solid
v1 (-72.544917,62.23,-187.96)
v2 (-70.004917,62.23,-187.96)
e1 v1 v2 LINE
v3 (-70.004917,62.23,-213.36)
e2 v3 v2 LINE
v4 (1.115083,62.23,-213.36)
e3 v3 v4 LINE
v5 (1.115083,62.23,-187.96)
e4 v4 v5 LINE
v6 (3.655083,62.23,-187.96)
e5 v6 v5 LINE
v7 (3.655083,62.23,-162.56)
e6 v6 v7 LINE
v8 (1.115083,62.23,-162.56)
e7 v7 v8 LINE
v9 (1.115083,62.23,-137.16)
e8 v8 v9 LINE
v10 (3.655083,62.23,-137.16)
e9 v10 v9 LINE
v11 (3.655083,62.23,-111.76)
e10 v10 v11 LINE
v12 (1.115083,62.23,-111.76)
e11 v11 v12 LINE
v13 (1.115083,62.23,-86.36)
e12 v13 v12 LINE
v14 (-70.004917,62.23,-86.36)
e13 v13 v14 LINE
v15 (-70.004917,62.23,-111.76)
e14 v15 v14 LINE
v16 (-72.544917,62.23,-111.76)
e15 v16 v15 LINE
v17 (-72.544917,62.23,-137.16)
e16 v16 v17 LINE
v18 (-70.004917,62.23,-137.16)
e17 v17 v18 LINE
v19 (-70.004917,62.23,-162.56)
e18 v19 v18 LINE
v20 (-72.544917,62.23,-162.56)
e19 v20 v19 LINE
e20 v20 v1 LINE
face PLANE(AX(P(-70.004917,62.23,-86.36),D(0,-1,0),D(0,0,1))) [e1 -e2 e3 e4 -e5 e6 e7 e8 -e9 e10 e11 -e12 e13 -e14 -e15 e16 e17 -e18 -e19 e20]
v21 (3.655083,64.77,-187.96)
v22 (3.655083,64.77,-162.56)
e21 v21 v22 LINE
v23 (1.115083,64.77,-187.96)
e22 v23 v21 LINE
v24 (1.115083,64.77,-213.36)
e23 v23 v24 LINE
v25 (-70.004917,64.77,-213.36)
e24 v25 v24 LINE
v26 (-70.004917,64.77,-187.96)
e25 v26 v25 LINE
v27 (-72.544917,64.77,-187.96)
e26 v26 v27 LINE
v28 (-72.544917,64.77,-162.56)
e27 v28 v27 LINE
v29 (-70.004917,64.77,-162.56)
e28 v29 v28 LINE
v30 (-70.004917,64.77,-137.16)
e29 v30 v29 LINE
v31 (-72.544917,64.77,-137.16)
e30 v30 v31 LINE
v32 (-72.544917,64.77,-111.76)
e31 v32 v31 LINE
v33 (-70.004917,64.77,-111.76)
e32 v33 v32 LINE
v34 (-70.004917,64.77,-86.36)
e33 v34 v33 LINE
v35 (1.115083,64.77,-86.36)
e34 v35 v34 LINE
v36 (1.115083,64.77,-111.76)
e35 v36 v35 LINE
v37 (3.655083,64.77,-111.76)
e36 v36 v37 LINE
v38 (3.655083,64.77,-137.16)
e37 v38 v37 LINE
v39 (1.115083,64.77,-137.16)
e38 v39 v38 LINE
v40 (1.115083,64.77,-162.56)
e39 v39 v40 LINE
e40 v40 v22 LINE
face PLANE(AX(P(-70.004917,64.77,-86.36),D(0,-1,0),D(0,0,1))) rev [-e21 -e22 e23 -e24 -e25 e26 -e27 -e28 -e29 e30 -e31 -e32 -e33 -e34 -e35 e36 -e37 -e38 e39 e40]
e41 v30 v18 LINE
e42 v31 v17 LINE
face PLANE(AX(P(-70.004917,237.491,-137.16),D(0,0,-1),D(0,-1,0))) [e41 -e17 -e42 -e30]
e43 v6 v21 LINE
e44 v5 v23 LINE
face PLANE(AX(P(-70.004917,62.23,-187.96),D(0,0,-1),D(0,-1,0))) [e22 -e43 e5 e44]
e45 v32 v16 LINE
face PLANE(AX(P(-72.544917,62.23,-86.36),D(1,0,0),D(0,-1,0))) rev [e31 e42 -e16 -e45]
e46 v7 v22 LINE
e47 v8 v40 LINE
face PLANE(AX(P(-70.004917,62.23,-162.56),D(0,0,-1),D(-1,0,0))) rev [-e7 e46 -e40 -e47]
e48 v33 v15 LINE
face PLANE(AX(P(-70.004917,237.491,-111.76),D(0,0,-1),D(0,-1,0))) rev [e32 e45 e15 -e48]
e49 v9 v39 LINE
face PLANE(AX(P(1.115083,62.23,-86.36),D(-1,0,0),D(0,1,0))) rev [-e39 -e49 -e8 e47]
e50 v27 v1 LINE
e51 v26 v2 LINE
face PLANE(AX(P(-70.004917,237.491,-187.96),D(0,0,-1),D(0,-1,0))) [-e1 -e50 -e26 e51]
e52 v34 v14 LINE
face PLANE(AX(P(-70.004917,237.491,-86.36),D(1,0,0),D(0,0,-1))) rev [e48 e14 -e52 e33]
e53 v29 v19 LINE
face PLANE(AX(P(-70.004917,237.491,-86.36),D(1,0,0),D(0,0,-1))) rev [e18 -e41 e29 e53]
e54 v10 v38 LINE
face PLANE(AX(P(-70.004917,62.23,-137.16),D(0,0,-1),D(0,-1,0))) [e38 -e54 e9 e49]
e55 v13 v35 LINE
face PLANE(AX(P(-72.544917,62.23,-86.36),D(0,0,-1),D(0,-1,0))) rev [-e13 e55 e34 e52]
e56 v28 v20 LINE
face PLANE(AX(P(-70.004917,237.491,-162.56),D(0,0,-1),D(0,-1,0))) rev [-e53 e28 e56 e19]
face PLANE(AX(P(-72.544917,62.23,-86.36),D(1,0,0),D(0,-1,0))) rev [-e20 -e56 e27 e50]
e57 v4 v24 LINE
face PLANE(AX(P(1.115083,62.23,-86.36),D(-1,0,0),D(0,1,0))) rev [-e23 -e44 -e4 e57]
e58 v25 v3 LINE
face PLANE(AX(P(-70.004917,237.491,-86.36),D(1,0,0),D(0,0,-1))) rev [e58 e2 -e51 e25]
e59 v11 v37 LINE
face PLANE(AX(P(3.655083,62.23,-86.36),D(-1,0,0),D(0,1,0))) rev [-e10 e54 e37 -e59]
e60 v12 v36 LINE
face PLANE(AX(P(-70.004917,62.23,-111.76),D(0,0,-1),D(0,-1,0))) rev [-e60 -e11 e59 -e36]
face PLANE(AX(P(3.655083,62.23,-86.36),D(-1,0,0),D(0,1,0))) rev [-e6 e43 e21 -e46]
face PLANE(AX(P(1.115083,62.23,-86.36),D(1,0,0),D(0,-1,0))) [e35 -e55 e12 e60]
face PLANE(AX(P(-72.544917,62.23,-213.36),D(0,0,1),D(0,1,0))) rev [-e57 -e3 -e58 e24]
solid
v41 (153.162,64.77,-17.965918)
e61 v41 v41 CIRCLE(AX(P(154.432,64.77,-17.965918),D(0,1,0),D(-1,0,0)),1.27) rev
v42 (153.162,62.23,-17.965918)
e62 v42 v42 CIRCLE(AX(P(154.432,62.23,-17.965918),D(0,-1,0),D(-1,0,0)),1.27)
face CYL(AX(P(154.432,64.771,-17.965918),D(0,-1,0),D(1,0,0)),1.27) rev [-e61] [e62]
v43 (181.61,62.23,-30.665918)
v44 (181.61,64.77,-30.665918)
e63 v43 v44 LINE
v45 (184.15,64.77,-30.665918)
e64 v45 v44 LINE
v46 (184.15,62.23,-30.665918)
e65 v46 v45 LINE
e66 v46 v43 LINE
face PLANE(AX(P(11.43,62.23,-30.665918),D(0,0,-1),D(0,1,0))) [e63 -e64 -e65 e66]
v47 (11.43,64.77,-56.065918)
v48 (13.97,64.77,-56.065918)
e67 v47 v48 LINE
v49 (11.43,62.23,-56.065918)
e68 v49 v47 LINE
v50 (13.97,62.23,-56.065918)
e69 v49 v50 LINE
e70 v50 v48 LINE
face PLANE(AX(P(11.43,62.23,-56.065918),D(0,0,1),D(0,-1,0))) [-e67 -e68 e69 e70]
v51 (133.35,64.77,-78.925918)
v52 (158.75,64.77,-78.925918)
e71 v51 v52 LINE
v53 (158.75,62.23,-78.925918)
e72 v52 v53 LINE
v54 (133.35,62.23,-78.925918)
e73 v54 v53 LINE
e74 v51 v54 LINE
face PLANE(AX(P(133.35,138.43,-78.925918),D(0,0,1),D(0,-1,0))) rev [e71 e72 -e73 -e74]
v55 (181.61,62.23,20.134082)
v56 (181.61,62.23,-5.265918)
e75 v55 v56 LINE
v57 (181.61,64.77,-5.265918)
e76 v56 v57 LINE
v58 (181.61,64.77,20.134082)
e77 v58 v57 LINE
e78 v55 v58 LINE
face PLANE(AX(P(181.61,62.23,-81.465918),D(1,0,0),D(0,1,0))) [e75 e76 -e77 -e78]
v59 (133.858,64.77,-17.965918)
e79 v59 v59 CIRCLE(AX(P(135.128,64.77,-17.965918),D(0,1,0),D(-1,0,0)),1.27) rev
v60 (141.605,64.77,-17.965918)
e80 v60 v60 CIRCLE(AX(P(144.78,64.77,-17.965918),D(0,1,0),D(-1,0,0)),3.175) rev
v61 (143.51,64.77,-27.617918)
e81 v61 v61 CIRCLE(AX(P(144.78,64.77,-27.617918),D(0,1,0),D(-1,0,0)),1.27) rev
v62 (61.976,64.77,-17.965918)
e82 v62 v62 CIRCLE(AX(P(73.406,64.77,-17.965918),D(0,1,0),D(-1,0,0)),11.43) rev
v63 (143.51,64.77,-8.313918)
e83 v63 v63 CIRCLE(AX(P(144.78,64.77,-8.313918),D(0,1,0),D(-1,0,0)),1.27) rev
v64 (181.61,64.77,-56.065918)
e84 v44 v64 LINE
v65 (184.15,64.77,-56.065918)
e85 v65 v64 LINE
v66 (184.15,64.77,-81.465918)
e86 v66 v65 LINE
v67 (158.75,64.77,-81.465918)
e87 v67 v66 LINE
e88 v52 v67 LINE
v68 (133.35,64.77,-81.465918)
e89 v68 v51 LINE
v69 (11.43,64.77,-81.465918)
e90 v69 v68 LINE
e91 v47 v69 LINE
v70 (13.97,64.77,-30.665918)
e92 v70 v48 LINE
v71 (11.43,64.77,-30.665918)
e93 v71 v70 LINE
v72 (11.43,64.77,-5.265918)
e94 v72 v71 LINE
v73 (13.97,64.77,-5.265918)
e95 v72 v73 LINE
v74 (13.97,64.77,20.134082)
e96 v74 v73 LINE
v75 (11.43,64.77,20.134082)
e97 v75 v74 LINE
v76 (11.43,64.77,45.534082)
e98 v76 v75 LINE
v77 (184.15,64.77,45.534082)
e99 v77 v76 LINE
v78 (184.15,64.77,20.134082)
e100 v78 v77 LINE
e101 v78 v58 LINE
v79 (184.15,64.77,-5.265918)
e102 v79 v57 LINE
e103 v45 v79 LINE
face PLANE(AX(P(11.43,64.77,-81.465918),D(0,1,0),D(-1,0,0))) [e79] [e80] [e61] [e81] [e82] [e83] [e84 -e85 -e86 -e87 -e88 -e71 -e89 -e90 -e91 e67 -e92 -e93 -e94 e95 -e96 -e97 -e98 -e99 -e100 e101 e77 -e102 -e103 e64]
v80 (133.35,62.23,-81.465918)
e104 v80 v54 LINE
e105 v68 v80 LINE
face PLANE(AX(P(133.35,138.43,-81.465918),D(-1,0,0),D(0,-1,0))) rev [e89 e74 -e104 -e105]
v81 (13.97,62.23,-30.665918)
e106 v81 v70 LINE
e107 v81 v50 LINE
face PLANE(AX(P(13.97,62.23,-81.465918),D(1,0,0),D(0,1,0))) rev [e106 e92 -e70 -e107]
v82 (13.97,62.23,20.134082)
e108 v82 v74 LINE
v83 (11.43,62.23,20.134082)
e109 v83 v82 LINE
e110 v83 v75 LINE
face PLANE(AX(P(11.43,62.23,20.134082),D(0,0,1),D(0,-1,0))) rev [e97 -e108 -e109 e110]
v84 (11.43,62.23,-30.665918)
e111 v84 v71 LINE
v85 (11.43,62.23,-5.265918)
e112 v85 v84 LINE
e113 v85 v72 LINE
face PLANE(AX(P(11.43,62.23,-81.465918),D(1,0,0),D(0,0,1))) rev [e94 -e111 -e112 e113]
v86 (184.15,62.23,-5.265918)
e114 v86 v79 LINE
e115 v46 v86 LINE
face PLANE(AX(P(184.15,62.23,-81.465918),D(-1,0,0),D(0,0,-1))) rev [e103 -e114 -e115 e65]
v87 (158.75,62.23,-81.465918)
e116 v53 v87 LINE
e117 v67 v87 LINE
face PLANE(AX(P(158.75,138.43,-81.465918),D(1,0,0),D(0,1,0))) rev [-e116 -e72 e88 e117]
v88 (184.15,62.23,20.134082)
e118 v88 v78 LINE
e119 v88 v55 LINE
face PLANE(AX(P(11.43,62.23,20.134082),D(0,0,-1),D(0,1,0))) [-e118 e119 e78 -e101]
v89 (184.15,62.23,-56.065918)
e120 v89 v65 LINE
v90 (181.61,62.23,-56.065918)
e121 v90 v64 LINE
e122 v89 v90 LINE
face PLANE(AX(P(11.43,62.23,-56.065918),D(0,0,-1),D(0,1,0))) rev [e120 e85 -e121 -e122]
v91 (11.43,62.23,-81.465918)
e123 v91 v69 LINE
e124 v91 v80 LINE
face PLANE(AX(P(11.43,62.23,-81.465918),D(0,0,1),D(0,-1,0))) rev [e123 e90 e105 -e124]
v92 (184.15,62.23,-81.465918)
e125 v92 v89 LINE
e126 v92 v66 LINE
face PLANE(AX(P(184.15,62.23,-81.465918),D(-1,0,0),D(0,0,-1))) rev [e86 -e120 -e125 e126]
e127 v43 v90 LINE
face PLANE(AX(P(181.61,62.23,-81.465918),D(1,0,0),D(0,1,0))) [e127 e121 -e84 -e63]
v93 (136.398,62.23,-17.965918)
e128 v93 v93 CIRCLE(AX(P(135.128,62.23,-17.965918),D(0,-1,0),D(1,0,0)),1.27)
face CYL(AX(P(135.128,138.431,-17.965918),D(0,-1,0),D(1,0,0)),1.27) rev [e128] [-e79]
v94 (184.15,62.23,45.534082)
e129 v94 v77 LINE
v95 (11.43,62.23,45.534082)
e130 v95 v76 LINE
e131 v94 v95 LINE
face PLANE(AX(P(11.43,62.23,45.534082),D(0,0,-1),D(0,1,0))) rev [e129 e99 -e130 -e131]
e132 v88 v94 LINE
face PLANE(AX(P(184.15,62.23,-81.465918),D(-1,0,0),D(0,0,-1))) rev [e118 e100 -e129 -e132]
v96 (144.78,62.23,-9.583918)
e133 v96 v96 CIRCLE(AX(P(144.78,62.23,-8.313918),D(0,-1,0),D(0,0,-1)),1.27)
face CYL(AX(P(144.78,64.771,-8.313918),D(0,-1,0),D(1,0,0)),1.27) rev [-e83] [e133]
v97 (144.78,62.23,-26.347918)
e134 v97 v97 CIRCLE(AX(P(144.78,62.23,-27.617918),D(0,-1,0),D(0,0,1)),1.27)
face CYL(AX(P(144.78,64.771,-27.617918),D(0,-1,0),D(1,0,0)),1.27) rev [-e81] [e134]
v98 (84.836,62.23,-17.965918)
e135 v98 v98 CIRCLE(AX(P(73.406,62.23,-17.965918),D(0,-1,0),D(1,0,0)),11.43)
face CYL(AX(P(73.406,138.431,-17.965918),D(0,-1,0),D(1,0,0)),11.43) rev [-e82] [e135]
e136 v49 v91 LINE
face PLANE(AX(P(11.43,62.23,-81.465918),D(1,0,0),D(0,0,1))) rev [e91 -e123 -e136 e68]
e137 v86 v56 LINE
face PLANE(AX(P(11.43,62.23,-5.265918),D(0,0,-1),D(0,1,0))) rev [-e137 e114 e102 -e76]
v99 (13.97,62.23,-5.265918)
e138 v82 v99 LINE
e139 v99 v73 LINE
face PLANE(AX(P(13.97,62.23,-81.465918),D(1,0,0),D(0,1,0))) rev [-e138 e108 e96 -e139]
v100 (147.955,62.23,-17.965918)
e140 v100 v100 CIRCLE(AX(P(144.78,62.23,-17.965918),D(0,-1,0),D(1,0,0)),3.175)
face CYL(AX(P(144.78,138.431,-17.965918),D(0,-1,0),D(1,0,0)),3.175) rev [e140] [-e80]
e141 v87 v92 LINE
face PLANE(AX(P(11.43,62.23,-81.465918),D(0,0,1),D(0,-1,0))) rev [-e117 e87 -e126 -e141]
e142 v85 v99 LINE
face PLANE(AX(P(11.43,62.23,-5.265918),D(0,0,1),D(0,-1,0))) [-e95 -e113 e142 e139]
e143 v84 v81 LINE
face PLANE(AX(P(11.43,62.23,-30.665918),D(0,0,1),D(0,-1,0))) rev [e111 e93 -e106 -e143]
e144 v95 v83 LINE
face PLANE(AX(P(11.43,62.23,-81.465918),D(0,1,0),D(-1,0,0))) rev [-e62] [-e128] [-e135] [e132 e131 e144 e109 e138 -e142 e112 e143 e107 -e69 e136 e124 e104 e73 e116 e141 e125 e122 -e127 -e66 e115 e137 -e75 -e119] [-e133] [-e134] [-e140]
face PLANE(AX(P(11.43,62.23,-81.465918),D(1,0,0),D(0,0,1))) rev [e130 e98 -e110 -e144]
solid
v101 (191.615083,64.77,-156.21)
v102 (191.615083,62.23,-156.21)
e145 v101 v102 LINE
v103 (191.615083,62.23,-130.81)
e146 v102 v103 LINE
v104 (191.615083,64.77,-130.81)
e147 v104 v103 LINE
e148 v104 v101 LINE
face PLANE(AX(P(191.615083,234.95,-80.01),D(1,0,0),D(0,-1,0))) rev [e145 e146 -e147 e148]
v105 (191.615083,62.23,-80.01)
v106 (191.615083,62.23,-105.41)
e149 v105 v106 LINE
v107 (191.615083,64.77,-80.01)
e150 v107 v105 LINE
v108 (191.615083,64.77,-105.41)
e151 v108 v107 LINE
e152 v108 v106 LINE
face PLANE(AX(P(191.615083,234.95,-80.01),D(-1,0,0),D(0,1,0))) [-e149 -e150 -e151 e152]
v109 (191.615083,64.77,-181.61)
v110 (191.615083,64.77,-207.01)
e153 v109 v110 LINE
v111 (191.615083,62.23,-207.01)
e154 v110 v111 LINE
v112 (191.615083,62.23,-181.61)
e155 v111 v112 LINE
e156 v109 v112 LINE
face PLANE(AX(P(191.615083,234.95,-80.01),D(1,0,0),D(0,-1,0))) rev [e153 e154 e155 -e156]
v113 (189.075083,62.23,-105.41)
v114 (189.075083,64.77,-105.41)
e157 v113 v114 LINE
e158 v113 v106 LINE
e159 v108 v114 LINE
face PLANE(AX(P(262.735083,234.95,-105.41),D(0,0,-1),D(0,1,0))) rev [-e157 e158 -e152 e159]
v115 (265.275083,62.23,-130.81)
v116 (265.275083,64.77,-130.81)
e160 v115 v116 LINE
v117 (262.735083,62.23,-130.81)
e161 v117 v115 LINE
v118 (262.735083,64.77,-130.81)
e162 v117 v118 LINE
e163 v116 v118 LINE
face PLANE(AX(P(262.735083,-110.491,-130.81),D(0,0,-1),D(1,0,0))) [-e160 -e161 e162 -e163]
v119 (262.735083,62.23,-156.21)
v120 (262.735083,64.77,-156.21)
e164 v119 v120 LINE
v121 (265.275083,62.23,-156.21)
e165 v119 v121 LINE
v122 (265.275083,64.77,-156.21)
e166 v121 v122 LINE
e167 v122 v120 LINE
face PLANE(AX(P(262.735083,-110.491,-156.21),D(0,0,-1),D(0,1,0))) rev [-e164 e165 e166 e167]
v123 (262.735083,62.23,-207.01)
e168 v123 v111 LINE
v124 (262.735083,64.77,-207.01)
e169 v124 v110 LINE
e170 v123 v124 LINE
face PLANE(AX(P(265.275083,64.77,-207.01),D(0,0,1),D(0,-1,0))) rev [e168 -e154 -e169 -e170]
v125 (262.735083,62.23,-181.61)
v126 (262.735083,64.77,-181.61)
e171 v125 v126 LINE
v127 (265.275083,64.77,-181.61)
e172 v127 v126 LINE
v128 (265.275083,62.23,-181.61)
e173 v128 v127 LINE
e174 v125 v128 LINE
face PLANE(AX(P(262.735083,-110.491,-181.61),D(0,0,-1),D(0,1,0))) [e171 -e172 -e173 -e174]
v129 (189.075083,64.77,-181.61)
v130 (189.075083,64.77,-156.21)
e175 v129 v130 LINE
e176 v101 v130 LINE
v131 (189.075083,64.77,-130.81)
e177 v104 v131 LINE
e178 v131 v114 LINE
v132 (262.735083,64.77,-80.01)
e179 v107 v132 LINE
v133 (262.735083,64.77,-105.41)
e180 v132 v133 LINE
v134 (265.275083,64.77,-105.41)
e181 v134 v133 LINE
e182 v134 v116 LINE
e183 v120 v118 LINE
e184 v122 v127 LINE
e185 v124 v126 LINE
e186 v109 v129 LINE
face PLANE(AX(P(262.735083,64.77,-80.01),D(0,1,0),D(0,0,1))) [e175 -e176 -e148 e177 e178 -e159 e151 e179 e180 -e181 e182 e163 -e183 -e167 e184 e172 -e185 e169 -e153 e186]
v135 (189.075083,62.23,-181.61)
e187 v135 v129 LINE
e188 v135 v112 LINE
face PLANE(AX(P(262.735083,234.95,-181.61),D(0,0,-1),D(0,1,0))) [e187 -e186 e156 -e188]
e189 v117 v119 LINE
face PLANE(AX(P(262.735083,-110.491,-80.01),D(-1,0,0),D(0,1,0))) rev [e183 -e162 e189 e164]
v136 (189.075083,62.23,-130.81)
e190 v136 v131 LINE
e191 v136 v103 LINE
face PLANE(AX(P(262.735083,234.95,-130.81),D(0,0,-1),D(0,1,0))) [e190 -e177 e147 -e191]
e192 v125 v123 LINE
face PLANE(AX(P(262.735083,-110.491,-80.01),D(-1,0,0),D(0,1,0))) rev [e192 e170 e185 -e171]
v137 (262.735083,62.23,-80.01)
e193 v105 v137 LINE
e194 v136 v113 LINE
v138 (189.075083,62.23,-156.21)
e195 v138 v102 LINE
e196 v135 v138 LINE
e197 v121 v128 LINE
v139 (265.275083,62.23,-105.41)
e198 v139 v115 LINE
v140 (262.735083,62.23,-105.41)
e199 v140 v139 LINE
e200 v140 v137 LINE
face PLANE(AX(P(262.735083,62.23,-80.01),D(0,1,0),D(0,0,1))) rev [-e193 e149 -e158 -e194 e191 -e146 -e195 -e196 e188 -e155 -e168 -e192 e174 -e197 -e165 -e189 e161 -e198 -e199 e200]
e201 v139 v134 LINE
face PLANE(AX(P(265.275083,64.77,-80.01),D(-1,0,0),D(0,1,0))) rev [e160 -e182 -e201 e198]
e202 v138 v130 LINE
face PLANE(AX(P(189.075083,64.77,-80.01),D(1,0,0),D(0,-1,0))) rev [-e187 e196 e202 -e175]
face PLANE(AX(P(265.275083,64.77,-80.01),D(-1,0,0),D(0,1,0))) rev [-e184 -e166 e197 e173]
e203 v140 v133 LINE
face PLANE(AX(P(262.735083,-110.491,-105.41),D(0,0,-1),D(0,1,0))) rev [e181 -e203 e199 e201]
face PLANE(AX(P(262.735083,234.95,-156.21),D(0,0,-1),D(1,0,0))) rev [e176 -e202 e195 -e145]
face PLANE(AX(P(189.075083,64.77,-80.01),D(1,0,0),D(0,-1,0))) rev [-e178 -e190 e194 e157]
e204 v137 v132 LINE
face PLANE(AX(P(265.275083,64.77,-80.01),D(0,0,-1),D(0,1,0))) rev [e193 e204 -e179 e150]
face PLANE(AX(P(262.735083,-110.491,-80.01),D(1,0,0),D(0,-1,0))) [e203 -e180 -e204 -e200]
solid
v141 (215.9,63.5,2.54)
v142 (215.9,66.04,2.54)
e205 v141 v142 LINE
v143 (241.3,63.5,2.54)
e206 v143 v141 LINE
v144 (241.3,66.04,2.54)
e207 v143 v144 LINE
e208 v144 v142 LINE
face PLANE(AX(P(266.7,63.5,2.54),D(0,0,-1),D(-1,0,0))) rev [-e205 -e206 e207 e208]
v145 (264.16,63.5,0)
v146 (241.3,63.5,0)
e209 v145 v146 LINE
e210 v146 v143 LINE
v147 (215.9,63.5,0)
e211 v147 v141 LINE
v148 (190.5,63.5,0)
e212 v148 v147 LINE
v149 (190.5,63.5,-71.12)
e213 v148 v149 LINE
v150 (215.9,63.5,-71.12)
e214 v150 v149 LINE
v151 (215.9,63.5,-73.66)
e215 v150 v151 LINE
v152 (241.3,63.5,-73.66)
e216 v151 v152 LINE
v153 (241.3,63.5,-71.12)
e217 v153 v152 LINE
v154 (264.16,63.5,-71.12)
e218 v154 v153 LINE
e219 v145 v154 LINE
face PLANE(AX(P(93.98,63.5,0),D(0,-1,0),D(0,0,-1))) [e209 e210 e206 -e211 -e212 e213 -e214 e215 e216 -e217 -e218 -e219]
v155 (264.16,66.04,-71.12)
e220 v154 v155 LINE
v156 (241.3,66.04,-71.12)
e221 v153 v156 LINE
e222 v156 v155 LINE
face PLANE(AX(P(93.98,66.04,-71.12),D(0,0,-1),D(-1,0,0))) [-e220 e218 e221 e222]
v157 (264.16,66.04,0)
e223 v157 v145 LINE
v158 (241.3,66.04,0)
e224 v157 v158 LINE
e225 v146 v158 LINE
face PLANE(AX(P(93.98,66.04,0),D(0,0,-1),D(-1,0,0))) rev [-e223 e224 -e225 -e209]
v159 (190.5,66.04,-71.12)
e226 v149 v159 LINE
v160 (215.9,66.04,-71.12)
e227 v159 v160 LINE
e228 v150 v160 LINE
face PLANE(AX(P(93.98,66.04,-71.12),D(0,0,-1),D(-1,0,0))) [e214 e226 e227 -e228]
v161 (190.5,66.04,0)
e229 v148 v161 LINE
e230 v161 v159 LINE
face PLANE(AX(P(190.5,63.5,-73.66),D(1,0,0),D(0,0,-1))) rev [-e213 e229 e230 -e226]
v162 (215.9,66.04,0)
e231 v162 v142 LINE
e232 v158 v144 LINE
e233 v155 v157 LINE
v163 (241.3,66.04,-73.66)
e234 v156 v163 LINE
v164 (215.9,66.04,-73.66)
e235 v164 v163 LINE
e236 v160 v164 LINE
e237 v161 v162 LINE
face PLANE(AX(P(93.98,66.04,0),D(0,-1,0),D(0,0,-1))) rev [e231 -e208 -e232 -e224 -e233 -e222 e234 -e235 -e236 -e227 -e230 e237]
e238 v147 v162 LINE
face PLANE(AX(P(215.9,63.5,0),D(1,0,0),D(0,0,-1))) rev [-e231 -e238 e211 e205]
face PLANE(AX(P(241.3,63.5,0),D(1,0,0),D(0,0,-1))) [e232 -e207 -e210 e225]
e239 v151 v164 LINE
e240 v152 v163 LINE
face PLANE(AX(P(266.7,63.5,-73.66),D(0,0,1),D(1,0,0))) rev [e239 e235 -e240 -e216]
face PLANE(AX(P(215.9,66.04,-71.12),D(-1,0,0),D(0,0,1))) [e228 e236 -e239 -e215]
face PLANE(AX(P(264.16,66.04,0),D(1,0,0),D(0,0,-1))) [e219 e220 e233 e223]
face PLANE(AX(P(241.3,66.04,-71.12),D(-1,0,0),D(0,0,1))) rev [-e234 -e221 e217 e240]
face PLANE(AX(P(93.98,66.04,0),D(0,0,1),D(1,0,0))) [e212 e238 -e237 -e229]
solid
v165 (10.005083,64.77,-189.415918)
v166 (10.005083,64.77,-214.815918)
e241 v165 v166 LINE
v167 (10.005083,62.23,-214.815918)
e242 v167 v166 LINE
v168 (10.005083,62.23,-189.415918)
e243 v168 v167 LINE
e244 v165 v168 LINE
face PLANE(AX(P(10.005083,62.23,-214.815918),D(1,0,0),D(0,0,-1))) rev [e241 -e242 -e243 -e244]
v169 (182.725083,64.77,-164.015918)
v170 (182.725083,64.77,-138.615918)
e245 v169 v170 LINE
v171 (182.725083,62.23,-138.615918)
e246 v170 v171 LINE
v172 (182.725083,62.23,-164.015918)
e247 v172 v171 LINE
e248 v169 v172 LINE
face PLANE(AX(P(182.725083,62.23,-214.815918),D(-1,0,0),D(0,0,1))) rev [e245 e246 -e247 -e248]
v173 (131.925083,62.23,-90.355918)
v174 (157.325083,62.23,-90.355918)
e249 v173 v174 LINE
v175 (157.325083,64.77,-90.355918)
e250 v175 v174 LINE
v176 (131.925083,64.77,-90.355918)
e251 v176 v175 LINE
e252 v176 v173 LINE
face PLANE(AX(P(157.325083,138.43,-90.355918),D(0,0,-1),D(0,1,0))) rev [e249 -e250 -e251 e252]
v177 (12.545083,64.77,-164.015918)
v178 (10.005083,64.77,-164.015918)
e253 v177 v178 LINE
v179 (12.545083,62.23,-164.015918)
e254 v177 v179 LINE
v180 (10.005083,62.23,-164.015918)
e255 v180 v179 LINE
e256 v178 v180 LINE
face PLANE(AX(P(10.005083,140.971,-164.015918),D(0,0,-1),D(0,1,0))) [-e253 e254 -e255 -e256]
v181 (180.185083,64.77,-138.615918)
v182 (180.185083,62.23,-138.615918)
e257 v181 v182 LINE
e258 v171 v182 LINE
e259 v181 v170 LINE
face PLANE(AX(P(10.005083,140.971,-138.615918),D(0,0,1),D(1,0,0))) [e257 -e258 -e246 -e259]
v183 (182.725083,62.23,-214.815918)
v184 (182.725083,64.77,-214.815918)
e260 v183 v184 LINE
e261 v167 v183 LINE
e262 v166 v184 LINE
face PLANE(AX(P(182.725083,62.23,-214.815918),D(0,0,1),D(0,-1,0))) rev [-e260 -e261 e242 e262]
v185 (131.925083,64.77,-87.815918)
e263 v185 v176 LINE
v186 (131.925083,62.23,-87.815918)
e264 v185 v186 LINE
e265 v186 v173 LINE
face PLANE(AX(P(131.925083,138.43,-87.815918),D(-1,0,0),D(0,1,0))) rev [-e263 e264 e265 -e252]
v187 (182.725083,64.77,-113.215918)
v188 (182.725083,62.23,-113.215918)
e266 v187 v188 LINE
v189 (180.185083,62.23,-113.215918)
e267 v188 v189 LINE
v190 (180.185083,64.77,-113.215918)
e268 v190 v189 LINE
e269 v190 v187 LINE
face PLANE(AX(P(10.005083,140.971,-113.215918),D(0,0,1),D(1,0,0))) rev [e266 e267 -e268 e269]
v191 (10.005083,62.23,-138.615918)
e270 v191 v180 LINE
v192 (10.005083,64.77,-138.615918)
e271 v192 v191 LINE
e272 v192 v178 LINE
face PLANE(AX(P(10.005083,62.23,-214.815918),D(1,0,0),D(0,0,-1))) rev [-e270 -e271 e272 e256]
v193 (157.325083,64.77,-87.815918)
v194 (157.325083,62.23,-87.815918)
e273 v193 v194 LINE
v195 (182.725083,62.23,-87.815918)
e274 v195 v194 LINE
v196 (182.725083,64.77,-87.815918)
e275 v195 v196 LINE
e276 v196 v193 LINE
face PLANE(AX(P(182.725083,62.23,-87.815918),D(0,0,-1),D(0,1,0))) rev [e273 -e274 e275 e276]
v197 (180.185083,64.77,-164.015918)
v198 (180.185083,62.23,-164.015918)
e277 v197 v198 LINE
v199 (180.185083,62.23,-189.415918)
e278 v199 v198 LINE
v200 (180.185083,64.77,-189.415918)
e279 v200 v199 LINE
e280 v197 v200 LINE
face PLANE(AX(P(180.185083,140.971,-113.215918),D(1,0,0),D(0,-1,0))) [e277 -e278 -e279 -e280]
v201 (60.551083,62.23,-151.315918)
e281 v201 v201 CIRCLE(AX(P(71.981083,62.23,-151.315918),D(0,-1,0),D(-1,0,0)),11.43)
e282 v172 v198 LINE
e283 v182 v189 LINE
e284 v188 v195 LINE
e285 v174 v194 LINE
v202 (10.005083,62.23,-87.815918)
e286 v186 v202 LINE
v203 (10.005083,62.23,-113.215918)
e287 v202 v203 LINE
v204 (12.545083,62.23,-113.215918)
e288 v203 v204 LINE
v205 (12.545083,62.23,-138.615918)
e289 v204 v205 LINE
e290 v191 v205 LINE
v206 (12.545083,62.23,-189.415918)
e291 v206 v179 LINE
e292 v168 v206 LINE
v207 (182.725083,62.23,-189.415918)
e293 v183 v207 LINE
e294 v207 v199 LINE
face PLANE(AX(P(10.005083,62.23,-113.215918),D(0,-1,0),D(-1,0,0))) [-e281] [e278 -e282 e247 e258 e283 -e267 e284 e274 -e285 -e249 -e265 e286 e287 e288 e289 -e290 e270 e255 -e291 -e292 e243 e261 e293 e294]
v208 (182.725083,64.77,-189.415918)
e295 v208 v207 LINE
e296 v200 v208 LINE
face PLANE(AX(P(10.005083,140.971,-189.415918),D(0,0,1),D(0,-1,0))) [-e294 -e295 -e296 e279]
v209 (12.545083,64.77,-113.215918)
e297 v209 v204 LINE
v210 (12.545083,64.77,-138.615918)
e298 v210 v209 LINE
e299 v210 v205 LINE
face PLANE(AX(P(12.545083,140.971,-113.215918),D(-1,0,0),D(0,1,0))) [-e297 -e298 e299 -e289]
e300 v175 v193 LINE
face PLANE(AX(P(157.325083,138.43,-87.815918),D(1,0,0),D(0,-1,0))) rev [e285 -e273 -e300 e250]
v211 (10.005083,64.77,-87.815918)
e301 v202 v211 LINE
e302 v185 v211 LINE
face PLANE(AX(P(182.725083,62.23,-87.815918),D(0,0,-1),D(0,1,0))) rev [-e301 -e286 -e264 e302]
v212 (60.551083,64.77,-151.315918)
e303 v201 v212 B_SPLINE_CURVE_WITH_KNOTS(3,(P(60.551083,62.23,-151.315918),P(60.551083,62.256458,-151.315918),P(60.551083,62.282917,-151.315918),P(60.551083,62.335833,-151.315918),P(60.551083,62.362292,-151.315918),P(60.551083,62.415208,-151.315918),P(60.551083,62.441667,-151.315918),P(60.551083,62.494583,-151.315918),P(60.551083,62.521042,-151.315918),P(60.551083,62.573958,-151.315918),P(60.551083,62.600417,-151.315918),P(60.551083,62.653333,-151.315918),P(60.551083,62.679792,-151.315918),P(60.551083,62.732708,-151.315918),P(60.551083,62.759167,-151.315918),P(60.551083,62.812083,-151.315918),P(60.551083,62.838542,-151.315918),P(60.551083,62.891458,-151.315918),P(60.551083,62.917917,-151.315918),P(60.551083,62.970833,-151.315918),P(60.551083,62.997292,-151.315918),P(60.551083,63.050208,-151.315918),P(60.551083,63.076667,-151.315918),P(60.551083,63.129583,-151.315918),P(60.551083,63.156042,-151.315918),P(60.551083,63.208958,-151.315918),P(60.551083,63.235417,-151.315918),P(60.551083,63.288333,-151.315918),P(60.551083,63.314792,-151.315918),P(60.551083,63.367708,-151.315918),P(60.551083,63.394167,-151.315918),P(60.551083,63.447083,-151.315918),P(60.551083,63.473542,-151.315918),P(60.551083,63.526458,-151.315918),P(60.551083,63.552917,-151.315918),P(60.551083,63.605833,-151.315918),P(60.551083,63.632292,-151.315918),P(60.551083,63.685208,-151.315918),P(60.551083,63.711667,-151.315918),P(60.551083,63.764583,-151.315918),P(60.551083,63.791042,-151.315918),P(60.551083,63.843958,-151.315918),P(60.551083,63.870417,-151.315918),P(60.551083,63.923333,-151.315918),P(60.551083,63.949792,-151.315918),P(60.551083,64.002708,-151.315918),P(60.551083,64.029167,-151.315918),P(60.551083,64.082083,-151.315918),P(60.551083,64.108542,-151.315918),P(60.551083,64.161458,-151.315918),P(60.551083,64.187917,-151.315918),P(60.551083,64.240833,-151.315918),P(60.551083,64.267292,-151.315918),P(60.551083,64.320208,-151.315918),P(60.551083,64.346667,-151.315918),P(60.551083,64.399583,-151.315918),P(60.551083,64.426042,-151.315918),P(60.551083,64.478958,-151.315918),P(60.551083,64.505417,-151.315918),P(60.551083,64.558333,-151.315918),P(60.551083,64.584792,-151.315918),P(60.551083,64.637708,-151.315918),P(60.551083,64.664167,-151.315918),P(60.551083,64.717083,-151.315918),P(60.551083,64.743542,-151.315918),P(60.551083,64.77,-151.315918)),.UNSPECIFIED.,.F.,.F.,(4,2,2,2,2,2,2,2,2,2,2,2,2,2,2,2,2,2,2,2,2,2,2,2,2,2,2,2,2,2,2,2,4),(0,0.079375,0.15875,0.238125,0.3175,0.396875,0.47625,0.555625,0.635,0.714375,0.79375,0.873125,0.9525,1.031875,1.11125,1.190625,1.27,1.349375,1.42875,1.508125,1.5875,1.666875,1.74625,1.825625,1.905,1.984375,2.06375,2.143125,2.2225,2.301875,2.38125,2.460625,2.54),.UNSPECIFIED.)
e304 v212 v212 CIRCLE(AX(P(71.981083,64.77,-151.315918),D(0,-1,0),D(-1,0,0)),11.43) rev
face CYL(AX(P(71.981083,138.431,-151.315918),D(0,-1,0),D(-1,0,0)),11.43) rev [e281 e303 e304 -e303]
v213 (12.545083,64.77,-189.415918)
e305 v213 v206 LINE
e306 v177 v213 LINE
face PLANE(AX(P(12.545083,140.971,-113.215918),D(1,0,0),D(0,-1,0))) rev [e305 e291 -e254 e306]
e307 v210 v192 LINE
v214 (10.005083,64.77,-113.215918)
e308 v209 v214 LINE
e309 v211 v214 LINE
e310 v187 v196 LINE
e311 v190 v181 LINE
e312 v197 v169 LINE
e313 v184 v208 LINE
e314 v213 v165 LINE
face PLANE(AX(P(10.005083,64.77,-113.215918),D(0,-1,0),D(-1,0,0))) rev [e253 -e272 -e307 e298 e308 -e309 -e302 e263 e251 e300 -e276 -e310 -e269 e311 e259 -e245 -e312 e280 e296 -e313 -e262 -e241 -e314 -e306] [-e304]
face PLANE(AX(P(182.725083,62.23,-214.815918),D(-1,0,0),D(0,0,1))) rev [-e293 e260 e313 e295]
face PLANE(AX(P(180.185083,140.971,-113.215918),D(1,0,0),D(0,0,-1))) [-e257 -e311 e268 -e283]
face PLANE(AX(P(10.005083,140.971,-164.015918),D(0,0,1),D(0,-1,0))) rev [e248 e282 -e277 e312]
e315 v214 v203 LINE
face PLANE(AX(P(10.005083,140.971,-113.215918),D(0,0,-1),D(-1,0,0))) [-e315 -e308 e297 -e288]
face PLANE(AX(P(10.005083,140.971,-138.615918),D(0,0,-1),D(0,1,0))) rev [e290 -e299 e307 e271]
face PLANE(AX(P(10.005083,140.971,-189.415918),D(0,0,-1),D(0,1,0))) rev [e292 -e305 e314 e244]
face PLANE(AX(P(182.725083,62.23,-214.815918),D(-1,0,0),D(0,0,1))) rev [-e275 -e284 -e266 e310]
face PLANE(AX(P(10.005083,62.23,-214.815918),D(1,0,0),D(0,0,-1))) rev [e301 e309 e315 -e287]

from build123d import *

# Parameters (mm, degrees)
SKETCH1_W                = 172.72
SKETCH1_H                = 127
BOSS_EXTRUDE1_DEPTH      = 2.54
SKETCH2_W                = 2.54
SKETCH2_H                = 25.4
CUT_EXTRUDE1_DEPTH       = 215.400676305
SKETCH3_W                = 2.54
SKETCH3_H                = 25.4
CUT_EXTRUDE2_DEPTH       = 215.400676305
SKETCH11_W               = 76.2
SKETCH11_H               = 127
BOSS_EXTRUDE7_DEPTH      = 2.54
SKETCH19_W               = 2.54
SKETCH19_H               = 25.4
CUT_EXTRUDE7_DEPTH       = 2.54
SKETCH20_W               = 76.2
SKETCH20_H               = 127
BOSS_EXTRUDE8_DEPTH      = 2.54
SKETCH21_W               = 2.54
SKETCH21_H               = 25.4
CUT_EXTRUDE8_DEPTH       = 2.54
SKETCH22_W               = 2.54
SKETCH22_H               = 25.4
CUT_EXTRUDE9_DEPTH       = 227.686995657
SKETCH24_W               = 172.72
SKETCH24_H               = 127
BOSS_EXTRUDE9_DEPTH      = 2.54
SKETCH25_W               = 2.54
SKETCH25_H               = 25.4
CUT_EXTRUDE11_DEPTH      = 2.54
SKETCH28_W               = 76.2
SKETCH28_H               = 76.2
BOSS_EXTRUDE10_DEPTH     = 2.54
SKETCH29_W               = 25.4
SKETCH29_H               = 2.54
CUT_EXTRUDE12_DEPTH      = 2.54
SKETCH30_W               = 25.4
SKETCH30_H               = 2.54
CUT_EXTRUDE13_DEPTH      = 2.54
CUT_EXTRUDE14_DEPTH      = 228.525028074
CUT_EXTRUDE14_DEPTH_BACK = 228.525028074
SKETCH31_W               = 25.4
SKETCH31_H               = 2.54
SKETCH32_W               = 25.4
SKETCH32_H               = 2.54
CUT_EXTRUDE15_DEPTH      = 228.525028074
SKETCH35_W               = 71.12
SKETCH35_H               = 2.54
CUT_EXTRUDE16_DEPTH      = 2.54
SKETCH36_R               = 11.43
CUT_EXTRUDE17_DEPTH      = 2.54
SKETCH37_R               = 3.175
CUT_EXTRUDE18_DEPTH      = 2.54
SKETCH38_R               = 1.27
CUT_EXTRUDE19_DEPTH      = 2.54
CIRPATTERN1_COUNT        = 4
CUT_EXTRUDE20_START      = -2.54
SKETCH44_R               = 11.43
CUT_EXTRUDE20_DEPTH      = 2.54
BODY_MOVE_COPY31_ANGLE   = 90
BODY_MOVE_COPY33_ANGLE   = 90
BODY_MOVE_COPY35_ANGLE   = 90
BODY_MOVE_COPY36_ANGLE   = 90
BODY_MOVE_COPY39_ANGLE   = 90
BODY_MOVE_COPY41_ANGLE   = 90


with BuildPart() as part:
    # Sketch1 → Boss-Extrude1 (new body)
    with BuildSketch(Plane.XY):
        with Locations((86.36, 63.5)):
            Rectangle(SKETCH1_W, SKETCH1_H)
    extrude(amount=BOSS_EXTRUDE1_DEPTH)

    # Sketch2 → Cut-Extrude1 (cut, through all)
    with BuildSketch(Plane(origin=(0, 0, 0), x_dir=(-1, 0, 0), z_dir=(0, 0, -1))):
        with Locations((-171.45, 88.9)):
            Rectangle(SKETCH2_W, SKETCH2_H)
        with Locations((-171.45, 38.1)):
            Rectangle(SKETCH2_W, SKETCH2_H)
    extrude(amount=-CUT_EXTRUDE1_DEPTH, mode=Mode.SUBTRACT)

    # Sketch3 → Cut-Extrude2 (cut, through all)
    with BuildSketch(Plane(origin=(0, 0, 0), x_dir=(-1, 0, 0), z_dir=(0, 0, -1))):
        with Locations((-1.27, 88.9)):
            Rectangle(SKETCH3_W, SKETCH3_H)
        with Locations((-1.27, 38.1)):
            Rectangle(SKETCH3_W, SKETCH3_H)
    extrude(amount=-CUT_EXTRUDE2_DEPTH, mode=Mode.SUBTRACT)

    # Sketch31 → Cut-Extrude14 (cut, two sides: drawn at the far end of the back side and taken through both)
    with BuildSketch(Plane.XY.offset(2.54).offset(-CUT_EXTRUDE14_DEPTH_BACK)):
        with Locations((134.62, 1.27)):
            Rectangle(SKETCH31_W, SKETCH31_H)
    extrude(amount=CUT_EXTRUDE14_DEPTH + CUT_EXTRUDE14_DEPTH_BACK, mode=Mode.SUBTRACT)

    # Sketch36 → Cut-Extrude17 (cut)
    with BuildSketch(Plane.XY.offset(2.54)):
        with Locations((61.976, 63.5)):
            Circle(SKETCH36_R)
    extrude(amount=-CUT_EXTRUDE17_DEPTH, mode=Mode.SUBTRACT)

    # Sketch37 → Cut-Extrude18 (cut)
    with BuildSketch(Plane.XY.offset(2.54)):
        with Locations((133.35, 63.5)):
            Circle(SKETCH37_R)
    extrude(amount=-CUT_EXTRUDE18_DEPTH, mode=Mode.SUBTRACT)

    # Sketch38 → Cut-Extrude19 (cut)
    with BuildSketch(Plane.XY.offset(2.54)):
        with Locations((123.698, 63.5)):
            Circle(SKETCH38_R)
    cut_extrude19 = extrude(amount=-CUT_EXTRUDE19_DEPTH, mode=Mode.SUBTRACT)

    # CirPattern1: Cut-Extrude19 ×4 about axis
    cirpattern1_axis = Axis((133.35, 63.5, 0), (0, 0, 1))
    for i in range(1, CIRPATTERN1_COUNT):
        add(cut_extrude19.rotate(cirpattern1_axis, i * 360 / CIRPATTERN1_COUNT), mode=Mode.SUBTRACT)


with BuildPart() as body_2:
    # Sketch11 → Boss-Extrude7 (new body)
    with BuildSketch(Plane.ZY):
        with Locations((-35.56, 63.5)):
            Rectangle(SKETCH11_W, SKETCH11_H)
    extrude(amount=BOSS_EXTRUDE7_DEPTH)

    # Sketch19 → Cut-Extrude7 (cut)
    with BuildSketch(Plane.ZY.offset(2.54)):
        with Locations((1.27, 114.3)):
            Rectangle(SKETCH19_W, SKETCH19_H)
        with Locations((1.27, 63.5)):
            Rectangle(SKETCH19_W, SKETCH19_H)
        with Locations((1.27, 12.7)):
            Rectangle(SKETCH19_W, SKETCH19_H)
    extrude(amount=-CUT_EXTRUDE7_DEPTH, mode=Mode.SUBTRACT)


with BuildPart() as body_2_1:
    # Body-Move/Copy1: read off the stored shape, not the designer's step
    # Body-Move/Copy1: moved
    add(body_2.part.moved(Location((172.72, 0, 0))))


with BuildPart() as body_3:
    # Sketch20 → Boss-Extrude8 (new body)
    with BuildSketch(Plane.ZY):
        with Locations((-35.56, 63.5)):
            Rectangle(SKETCH20_W, SKETCH20_H)
    extrude(amount=BOSS_EXTRUDE8_DEPTH)

    # Sketch21 → Cut-Extrude8 (cut)
    with BuildSketch(Plane.ZY.offset(2.54)):
        with Locations((1.27, 114.3)):
            Rectangle(SKETCH21_W, SKETCH21_H)
        with Locations((1.27, 63.5)):
            Rectangle(SKETCH21_W, SKETCH21_H)
        with Locations((1.27, 12.7)):
            Rectangle(SKETCH21_W, SKETCH21_H)
    extrude(amount=-CUT_EXTRUDE8_DEPTH, mode=Mode.SUBTRACT)


with BuildPart() as body_3_1:
    # Body-Move/Copy2: read off the stored shape, not the designer's step
    # Body-Move/Copy2: moved
    add(body_3.part.moved(Location((2.54, 0, 0))))


with BuildPart() as cut_extrude9_tool:
    # Sketch22 → Cut-Extrude9 (new, through all)
    with BuildSketch(Plane(origin=(172.72, 0, 0), x_dir=(0, 0, -1), z_dir=(1, 0, 0))):
        with Locations((72.39, 114.3)):
            Rectangle(SKETCH22_W, SKETCH22_H)
        with Locations((72.39, 63.5)):
            Rectangle(SKETCH22_W, SKETCH22_H)
        with Locations((72.39, 12.7)):
            Rectangle(SKETCH22_W, SKETCH22_H)
    extrude(amount=-CUT_EXTRUDE9_DEPTH)


with BuildPart() as body_2_2:
    add(body_2_1.part)

    # Cut-Extrude9: cut by cut_extrude9_tool
    add(cut_extrude9_tool.part, mode=Mode.SUBTRACT)


with BuildPart() as body_3_2:
    add(body_3_1.part)

    # Cut-Extrude9: cut by cut_extrude9_tool
    add(cut_extrude9_tool.part, mode=Mode.SUBTRACT)


with BuildPart() as body_4:
    # Sketch24 → Boss-Extrude9 (new body)
    with BuildSketch(Plane(origin=(0, 0, -73.66), x_dir=(-1, 0, 0), z_dir=(0, 0, -1))):
        with Locations((-86.36, 38.1)):
            Rectangle(SKETCH24_W, SKETCH24_H)
    extrude(amount=BOSS_EXTRUDE9_DEPTH)

    # Sketch25 → Cut-Extrude11 (cut)
    with BuildSketch(Plane(origin=(0, 0, -76.2), x_dir=(-1, 0, 0), z_dir=(0, 0, -1))):
        with Locations((-171.45, 12.7)):
            Rectangle(SKETCH25_W, SKETCH25_H)
        with Locations((-171.45, 63.5)):
            Rectangle(SKETCH25_W, SKETCH25_H)
        with Locations((-1.27, 63.5)):
            Rectangle(SKETCH25_W, SKETCH25_H)
        with Locations((-1.27, 12.7)):
            Rectangle(SKETCH25_W, SKETCH25_H)
    extrude(amount=-CUT_EXTRUDE11_DEPTH, mode=Mode.SUBTRACT)


with BuildPart() as body_4_1:
    # Body-Move/Copy4: read off the stored shape, not the designer's step
    # Body-Move/Copy4: moved
    add(body_4.part.moved(Location((0, 25.4, 0))))


with BuildPart() as body_4_2:
    # Body-Move/Copy5: read off the stored shape, not the designer's step
    # Body-Move/Copy5: moved
    add(body_4_1.part.moved(Location((0, 0, 2.54))))

    # Sketch32 → Cut-Extrude15 (cut, through all)
    with BuildSketch(Plane(origin=(0, 0, -73.66), x_dir=(-1, 0, 0), z_dir=(0, 0, -1))):
        with Locations((-134.62, 1.27)):
            Rectangle(SKETCH32_W, SKETCH32_H)
    extrude(amount=-CUT_EXTRUDE15_DEPTH, mode=Mode.SUBTRACT)

    # Sketch44 → Cut-Extrude20 (cut)
    with BuildSketch(Plane(origin=(0, 0, -73.66), x_dir=(-1, 0, 0), z_dir=(0, 0, -1)).offset(CUT_EXTRUDE20_START)):
        with Locations(Location((-61.976, 63.5, 0), (0, 0, 180))):
            Circle(SKETCH44_R)
    extrude(amount=CUT_EXTRUDE20_DEPTH, mode=Mode.SUBTRACT)


with BuildPart() as body_5:
    # Sketch28 → Boss-Extrude10 (new body)
    with BuildSketch(Plane(origin=(0, 0, 0), x_dir=(-1, 0, 0), z_dir=(0, -1, 0))):
        with Locations((-134.62, 35.56)):
            Rectangle(SKETCH28_W, SKETCH28_H)
    extrude(amount=BOSS_EXTRUDE10_DEPTH)

    # Sketch29 → Cut-Extrude12 (cut)
    with BuildSketch(Plane(origin=(0, 0, -73.66), x_dir=(-1, 0, 0), z_dir=(0, 0, -1))):
        with Locations((-160.02, -1.27)):
            Rectangle(SKETCH29_W, SKETCH29_H)
        with Locations((-109.22, -1.27)):
            Rectangle(SKETCH29_W, SKETCH29_H)
    extrude(amount=-CUT_EXTRUDE12_DEPTH, mode=Mode.SUBTRACT)

    # Sketch30 → Cut-Extrude13 (cut)
    with BuildSketch(Plane.XY.offset(2.54)):
        with Locations((109.22, -1.27)):
            Rectangle(SKETCH30_W, SKETCH30_H)
        with Locations((160.02, -1.27)):
            Rectangle(SKETCH30_W, SKETCH30_H)
    extrude(amount=-CUT_EXTRUDE13_DEPTH, mode=Mode.SUBTRACT)

    # Sketch35 → Cut-Extrude16 (cut)
    with BuildSketch(Plane(origin=(172.72, 0, 0), x_dir=(0, 0, -1), z_dir=(1, 0, 0))):
        with Locations((35.56, -1.27)):
            Rectangle(SKETCH35_W, SKETCH35_H)
    extrude(amount=-CUT_EXTRUDE16_DEPTH, mode=Mode.SUBTRACT)


with BuildPart() as body_5_1:
    # Body-Move/Copy6: read off the stored shape, not the designer's step
    # Body-Move/Copy6: moved
    add(body_5.part.moved(Location((0, 2.54, 0))))


with BuildPart() as body_4_3:
    # Body-Move/Copy31: moved
    add(body_4_2.part.rotate(Axis((0, 63.5, -72.39), (-1, 0, 0)), BODY_MOVE_COPY31_ANGLE))


with BuildPart() as body_4_4:
    # Body-Move/Copy32: moved
    add(body_4_3.part.moved(Location((0, 0, -78.925918228))))


with BuildPart() as part_1:
    # Body-Move/Copy33: moved
    add(part.part.rotate(Axis((0, 63.5, 1.27), (1, 0, 0)), BODY_MOVE_COPY33_ANGLE))


with BuildPart() as part_2:
    # Body-Move/Copy34: moved
    add(part_1.part.moved(Location((0, 0, 72.561038444))))


with BuildPart() as body_3_3:
    # Body-Move/Copy35: moved
    add(body_3_2.part.rotate(Axis((1.27, 63.5, 0), (0, 0, 1)), BODY_MOVE_COPY35_ANGLE))


with BuildPart() as body_2_3:
    # Body-Move/Copy36: moved
    add(body_2_2.part.rotate(Axis((171.45, 63.5, 0), (0, 0, -1)), BODY_MOVE_COPY36_ANGLE))


with BuildPart() as body_2_4:
    # Body-Move/Copy37: moved
    add(body_2_3.part.moved(Location((81.125082832, 0, 0))))


with BuildPart() as body_5_2:
    # Body-Move/Copy38: moved
    add(body_5_1.part.moved(Location((0, 63.5, 0))))


with BuildPart() as body_3_4:
    # Body-Move/Copy39: moved
    add(body_3_3.part.rotate(Axis((1.27, 0, -35.56), (0, -1, 0)), BODY_MOVE_COPY39_ANGLE))


with BuildPart() as body_3_5:
    # Body-Move/Copy40: moved
    add(body_3_4.part.moved(Location((-50.8, 0, -114.3))))


with BuildPart() as body_2_5:
    # Body-Move/Copy41: moved
    add(body_2_4.part.rotate(Axis((252.575082832, 0, -35.56), (0, 1, 0)), BODY_MOVE_COPY41_ANGLE))


with BuildPart() as body_2_6:
    # Body-Move/Copy42: moved
    add(body_2_5.part.moved(Location((-25.4, 0, -114.3))))


with BuildPart() as body_5_3:
    # Body-Move/Copy43: moved
    add(body_5_2.part.moved(Location((93.98, 0, 0))))


with BuildPart() as part_3:
    # Body-Move/Copy44: moved
    add(part_2.part.moved(Location((0, 0, -81.28))))


with BuildPart() as part_4:
    # Body-Move/Copy45: read off the stored shape, not the designer's step
    # Body-Move/Copy45: moved
    add(part_3.part.moved(Location((11.43, 0, -10.5169567))))


with BuildPart() as body_4_5:
    # Body-Move/Copy46: read off the stored shape, not the designer's step
    # Body-Move/Copy46: moved
    add(body_4_4.part.moved(Location((10.0050828, 0, 0))))


with BuildPart() as body_2_7:
    # Body-Move/Copy47: read off the stored shape, not the designer's step
    # Body-Move/Copy47: moved
    add(body_2_6.part.moved(Location((0, 0, 6.35))))


with BuildPart() as body_3_6:
    # Body-Move/Copy48: read off the stored shape, not the designer's step
    # Body-Move/Copy48: moved
    add(body_3_5.part.moved(Location((15.0850828, 0, 0))))


solid = Compound([body_5_3.part, part_4.part, body_4_5.part, body_2_7.part, body_3_6.part])
